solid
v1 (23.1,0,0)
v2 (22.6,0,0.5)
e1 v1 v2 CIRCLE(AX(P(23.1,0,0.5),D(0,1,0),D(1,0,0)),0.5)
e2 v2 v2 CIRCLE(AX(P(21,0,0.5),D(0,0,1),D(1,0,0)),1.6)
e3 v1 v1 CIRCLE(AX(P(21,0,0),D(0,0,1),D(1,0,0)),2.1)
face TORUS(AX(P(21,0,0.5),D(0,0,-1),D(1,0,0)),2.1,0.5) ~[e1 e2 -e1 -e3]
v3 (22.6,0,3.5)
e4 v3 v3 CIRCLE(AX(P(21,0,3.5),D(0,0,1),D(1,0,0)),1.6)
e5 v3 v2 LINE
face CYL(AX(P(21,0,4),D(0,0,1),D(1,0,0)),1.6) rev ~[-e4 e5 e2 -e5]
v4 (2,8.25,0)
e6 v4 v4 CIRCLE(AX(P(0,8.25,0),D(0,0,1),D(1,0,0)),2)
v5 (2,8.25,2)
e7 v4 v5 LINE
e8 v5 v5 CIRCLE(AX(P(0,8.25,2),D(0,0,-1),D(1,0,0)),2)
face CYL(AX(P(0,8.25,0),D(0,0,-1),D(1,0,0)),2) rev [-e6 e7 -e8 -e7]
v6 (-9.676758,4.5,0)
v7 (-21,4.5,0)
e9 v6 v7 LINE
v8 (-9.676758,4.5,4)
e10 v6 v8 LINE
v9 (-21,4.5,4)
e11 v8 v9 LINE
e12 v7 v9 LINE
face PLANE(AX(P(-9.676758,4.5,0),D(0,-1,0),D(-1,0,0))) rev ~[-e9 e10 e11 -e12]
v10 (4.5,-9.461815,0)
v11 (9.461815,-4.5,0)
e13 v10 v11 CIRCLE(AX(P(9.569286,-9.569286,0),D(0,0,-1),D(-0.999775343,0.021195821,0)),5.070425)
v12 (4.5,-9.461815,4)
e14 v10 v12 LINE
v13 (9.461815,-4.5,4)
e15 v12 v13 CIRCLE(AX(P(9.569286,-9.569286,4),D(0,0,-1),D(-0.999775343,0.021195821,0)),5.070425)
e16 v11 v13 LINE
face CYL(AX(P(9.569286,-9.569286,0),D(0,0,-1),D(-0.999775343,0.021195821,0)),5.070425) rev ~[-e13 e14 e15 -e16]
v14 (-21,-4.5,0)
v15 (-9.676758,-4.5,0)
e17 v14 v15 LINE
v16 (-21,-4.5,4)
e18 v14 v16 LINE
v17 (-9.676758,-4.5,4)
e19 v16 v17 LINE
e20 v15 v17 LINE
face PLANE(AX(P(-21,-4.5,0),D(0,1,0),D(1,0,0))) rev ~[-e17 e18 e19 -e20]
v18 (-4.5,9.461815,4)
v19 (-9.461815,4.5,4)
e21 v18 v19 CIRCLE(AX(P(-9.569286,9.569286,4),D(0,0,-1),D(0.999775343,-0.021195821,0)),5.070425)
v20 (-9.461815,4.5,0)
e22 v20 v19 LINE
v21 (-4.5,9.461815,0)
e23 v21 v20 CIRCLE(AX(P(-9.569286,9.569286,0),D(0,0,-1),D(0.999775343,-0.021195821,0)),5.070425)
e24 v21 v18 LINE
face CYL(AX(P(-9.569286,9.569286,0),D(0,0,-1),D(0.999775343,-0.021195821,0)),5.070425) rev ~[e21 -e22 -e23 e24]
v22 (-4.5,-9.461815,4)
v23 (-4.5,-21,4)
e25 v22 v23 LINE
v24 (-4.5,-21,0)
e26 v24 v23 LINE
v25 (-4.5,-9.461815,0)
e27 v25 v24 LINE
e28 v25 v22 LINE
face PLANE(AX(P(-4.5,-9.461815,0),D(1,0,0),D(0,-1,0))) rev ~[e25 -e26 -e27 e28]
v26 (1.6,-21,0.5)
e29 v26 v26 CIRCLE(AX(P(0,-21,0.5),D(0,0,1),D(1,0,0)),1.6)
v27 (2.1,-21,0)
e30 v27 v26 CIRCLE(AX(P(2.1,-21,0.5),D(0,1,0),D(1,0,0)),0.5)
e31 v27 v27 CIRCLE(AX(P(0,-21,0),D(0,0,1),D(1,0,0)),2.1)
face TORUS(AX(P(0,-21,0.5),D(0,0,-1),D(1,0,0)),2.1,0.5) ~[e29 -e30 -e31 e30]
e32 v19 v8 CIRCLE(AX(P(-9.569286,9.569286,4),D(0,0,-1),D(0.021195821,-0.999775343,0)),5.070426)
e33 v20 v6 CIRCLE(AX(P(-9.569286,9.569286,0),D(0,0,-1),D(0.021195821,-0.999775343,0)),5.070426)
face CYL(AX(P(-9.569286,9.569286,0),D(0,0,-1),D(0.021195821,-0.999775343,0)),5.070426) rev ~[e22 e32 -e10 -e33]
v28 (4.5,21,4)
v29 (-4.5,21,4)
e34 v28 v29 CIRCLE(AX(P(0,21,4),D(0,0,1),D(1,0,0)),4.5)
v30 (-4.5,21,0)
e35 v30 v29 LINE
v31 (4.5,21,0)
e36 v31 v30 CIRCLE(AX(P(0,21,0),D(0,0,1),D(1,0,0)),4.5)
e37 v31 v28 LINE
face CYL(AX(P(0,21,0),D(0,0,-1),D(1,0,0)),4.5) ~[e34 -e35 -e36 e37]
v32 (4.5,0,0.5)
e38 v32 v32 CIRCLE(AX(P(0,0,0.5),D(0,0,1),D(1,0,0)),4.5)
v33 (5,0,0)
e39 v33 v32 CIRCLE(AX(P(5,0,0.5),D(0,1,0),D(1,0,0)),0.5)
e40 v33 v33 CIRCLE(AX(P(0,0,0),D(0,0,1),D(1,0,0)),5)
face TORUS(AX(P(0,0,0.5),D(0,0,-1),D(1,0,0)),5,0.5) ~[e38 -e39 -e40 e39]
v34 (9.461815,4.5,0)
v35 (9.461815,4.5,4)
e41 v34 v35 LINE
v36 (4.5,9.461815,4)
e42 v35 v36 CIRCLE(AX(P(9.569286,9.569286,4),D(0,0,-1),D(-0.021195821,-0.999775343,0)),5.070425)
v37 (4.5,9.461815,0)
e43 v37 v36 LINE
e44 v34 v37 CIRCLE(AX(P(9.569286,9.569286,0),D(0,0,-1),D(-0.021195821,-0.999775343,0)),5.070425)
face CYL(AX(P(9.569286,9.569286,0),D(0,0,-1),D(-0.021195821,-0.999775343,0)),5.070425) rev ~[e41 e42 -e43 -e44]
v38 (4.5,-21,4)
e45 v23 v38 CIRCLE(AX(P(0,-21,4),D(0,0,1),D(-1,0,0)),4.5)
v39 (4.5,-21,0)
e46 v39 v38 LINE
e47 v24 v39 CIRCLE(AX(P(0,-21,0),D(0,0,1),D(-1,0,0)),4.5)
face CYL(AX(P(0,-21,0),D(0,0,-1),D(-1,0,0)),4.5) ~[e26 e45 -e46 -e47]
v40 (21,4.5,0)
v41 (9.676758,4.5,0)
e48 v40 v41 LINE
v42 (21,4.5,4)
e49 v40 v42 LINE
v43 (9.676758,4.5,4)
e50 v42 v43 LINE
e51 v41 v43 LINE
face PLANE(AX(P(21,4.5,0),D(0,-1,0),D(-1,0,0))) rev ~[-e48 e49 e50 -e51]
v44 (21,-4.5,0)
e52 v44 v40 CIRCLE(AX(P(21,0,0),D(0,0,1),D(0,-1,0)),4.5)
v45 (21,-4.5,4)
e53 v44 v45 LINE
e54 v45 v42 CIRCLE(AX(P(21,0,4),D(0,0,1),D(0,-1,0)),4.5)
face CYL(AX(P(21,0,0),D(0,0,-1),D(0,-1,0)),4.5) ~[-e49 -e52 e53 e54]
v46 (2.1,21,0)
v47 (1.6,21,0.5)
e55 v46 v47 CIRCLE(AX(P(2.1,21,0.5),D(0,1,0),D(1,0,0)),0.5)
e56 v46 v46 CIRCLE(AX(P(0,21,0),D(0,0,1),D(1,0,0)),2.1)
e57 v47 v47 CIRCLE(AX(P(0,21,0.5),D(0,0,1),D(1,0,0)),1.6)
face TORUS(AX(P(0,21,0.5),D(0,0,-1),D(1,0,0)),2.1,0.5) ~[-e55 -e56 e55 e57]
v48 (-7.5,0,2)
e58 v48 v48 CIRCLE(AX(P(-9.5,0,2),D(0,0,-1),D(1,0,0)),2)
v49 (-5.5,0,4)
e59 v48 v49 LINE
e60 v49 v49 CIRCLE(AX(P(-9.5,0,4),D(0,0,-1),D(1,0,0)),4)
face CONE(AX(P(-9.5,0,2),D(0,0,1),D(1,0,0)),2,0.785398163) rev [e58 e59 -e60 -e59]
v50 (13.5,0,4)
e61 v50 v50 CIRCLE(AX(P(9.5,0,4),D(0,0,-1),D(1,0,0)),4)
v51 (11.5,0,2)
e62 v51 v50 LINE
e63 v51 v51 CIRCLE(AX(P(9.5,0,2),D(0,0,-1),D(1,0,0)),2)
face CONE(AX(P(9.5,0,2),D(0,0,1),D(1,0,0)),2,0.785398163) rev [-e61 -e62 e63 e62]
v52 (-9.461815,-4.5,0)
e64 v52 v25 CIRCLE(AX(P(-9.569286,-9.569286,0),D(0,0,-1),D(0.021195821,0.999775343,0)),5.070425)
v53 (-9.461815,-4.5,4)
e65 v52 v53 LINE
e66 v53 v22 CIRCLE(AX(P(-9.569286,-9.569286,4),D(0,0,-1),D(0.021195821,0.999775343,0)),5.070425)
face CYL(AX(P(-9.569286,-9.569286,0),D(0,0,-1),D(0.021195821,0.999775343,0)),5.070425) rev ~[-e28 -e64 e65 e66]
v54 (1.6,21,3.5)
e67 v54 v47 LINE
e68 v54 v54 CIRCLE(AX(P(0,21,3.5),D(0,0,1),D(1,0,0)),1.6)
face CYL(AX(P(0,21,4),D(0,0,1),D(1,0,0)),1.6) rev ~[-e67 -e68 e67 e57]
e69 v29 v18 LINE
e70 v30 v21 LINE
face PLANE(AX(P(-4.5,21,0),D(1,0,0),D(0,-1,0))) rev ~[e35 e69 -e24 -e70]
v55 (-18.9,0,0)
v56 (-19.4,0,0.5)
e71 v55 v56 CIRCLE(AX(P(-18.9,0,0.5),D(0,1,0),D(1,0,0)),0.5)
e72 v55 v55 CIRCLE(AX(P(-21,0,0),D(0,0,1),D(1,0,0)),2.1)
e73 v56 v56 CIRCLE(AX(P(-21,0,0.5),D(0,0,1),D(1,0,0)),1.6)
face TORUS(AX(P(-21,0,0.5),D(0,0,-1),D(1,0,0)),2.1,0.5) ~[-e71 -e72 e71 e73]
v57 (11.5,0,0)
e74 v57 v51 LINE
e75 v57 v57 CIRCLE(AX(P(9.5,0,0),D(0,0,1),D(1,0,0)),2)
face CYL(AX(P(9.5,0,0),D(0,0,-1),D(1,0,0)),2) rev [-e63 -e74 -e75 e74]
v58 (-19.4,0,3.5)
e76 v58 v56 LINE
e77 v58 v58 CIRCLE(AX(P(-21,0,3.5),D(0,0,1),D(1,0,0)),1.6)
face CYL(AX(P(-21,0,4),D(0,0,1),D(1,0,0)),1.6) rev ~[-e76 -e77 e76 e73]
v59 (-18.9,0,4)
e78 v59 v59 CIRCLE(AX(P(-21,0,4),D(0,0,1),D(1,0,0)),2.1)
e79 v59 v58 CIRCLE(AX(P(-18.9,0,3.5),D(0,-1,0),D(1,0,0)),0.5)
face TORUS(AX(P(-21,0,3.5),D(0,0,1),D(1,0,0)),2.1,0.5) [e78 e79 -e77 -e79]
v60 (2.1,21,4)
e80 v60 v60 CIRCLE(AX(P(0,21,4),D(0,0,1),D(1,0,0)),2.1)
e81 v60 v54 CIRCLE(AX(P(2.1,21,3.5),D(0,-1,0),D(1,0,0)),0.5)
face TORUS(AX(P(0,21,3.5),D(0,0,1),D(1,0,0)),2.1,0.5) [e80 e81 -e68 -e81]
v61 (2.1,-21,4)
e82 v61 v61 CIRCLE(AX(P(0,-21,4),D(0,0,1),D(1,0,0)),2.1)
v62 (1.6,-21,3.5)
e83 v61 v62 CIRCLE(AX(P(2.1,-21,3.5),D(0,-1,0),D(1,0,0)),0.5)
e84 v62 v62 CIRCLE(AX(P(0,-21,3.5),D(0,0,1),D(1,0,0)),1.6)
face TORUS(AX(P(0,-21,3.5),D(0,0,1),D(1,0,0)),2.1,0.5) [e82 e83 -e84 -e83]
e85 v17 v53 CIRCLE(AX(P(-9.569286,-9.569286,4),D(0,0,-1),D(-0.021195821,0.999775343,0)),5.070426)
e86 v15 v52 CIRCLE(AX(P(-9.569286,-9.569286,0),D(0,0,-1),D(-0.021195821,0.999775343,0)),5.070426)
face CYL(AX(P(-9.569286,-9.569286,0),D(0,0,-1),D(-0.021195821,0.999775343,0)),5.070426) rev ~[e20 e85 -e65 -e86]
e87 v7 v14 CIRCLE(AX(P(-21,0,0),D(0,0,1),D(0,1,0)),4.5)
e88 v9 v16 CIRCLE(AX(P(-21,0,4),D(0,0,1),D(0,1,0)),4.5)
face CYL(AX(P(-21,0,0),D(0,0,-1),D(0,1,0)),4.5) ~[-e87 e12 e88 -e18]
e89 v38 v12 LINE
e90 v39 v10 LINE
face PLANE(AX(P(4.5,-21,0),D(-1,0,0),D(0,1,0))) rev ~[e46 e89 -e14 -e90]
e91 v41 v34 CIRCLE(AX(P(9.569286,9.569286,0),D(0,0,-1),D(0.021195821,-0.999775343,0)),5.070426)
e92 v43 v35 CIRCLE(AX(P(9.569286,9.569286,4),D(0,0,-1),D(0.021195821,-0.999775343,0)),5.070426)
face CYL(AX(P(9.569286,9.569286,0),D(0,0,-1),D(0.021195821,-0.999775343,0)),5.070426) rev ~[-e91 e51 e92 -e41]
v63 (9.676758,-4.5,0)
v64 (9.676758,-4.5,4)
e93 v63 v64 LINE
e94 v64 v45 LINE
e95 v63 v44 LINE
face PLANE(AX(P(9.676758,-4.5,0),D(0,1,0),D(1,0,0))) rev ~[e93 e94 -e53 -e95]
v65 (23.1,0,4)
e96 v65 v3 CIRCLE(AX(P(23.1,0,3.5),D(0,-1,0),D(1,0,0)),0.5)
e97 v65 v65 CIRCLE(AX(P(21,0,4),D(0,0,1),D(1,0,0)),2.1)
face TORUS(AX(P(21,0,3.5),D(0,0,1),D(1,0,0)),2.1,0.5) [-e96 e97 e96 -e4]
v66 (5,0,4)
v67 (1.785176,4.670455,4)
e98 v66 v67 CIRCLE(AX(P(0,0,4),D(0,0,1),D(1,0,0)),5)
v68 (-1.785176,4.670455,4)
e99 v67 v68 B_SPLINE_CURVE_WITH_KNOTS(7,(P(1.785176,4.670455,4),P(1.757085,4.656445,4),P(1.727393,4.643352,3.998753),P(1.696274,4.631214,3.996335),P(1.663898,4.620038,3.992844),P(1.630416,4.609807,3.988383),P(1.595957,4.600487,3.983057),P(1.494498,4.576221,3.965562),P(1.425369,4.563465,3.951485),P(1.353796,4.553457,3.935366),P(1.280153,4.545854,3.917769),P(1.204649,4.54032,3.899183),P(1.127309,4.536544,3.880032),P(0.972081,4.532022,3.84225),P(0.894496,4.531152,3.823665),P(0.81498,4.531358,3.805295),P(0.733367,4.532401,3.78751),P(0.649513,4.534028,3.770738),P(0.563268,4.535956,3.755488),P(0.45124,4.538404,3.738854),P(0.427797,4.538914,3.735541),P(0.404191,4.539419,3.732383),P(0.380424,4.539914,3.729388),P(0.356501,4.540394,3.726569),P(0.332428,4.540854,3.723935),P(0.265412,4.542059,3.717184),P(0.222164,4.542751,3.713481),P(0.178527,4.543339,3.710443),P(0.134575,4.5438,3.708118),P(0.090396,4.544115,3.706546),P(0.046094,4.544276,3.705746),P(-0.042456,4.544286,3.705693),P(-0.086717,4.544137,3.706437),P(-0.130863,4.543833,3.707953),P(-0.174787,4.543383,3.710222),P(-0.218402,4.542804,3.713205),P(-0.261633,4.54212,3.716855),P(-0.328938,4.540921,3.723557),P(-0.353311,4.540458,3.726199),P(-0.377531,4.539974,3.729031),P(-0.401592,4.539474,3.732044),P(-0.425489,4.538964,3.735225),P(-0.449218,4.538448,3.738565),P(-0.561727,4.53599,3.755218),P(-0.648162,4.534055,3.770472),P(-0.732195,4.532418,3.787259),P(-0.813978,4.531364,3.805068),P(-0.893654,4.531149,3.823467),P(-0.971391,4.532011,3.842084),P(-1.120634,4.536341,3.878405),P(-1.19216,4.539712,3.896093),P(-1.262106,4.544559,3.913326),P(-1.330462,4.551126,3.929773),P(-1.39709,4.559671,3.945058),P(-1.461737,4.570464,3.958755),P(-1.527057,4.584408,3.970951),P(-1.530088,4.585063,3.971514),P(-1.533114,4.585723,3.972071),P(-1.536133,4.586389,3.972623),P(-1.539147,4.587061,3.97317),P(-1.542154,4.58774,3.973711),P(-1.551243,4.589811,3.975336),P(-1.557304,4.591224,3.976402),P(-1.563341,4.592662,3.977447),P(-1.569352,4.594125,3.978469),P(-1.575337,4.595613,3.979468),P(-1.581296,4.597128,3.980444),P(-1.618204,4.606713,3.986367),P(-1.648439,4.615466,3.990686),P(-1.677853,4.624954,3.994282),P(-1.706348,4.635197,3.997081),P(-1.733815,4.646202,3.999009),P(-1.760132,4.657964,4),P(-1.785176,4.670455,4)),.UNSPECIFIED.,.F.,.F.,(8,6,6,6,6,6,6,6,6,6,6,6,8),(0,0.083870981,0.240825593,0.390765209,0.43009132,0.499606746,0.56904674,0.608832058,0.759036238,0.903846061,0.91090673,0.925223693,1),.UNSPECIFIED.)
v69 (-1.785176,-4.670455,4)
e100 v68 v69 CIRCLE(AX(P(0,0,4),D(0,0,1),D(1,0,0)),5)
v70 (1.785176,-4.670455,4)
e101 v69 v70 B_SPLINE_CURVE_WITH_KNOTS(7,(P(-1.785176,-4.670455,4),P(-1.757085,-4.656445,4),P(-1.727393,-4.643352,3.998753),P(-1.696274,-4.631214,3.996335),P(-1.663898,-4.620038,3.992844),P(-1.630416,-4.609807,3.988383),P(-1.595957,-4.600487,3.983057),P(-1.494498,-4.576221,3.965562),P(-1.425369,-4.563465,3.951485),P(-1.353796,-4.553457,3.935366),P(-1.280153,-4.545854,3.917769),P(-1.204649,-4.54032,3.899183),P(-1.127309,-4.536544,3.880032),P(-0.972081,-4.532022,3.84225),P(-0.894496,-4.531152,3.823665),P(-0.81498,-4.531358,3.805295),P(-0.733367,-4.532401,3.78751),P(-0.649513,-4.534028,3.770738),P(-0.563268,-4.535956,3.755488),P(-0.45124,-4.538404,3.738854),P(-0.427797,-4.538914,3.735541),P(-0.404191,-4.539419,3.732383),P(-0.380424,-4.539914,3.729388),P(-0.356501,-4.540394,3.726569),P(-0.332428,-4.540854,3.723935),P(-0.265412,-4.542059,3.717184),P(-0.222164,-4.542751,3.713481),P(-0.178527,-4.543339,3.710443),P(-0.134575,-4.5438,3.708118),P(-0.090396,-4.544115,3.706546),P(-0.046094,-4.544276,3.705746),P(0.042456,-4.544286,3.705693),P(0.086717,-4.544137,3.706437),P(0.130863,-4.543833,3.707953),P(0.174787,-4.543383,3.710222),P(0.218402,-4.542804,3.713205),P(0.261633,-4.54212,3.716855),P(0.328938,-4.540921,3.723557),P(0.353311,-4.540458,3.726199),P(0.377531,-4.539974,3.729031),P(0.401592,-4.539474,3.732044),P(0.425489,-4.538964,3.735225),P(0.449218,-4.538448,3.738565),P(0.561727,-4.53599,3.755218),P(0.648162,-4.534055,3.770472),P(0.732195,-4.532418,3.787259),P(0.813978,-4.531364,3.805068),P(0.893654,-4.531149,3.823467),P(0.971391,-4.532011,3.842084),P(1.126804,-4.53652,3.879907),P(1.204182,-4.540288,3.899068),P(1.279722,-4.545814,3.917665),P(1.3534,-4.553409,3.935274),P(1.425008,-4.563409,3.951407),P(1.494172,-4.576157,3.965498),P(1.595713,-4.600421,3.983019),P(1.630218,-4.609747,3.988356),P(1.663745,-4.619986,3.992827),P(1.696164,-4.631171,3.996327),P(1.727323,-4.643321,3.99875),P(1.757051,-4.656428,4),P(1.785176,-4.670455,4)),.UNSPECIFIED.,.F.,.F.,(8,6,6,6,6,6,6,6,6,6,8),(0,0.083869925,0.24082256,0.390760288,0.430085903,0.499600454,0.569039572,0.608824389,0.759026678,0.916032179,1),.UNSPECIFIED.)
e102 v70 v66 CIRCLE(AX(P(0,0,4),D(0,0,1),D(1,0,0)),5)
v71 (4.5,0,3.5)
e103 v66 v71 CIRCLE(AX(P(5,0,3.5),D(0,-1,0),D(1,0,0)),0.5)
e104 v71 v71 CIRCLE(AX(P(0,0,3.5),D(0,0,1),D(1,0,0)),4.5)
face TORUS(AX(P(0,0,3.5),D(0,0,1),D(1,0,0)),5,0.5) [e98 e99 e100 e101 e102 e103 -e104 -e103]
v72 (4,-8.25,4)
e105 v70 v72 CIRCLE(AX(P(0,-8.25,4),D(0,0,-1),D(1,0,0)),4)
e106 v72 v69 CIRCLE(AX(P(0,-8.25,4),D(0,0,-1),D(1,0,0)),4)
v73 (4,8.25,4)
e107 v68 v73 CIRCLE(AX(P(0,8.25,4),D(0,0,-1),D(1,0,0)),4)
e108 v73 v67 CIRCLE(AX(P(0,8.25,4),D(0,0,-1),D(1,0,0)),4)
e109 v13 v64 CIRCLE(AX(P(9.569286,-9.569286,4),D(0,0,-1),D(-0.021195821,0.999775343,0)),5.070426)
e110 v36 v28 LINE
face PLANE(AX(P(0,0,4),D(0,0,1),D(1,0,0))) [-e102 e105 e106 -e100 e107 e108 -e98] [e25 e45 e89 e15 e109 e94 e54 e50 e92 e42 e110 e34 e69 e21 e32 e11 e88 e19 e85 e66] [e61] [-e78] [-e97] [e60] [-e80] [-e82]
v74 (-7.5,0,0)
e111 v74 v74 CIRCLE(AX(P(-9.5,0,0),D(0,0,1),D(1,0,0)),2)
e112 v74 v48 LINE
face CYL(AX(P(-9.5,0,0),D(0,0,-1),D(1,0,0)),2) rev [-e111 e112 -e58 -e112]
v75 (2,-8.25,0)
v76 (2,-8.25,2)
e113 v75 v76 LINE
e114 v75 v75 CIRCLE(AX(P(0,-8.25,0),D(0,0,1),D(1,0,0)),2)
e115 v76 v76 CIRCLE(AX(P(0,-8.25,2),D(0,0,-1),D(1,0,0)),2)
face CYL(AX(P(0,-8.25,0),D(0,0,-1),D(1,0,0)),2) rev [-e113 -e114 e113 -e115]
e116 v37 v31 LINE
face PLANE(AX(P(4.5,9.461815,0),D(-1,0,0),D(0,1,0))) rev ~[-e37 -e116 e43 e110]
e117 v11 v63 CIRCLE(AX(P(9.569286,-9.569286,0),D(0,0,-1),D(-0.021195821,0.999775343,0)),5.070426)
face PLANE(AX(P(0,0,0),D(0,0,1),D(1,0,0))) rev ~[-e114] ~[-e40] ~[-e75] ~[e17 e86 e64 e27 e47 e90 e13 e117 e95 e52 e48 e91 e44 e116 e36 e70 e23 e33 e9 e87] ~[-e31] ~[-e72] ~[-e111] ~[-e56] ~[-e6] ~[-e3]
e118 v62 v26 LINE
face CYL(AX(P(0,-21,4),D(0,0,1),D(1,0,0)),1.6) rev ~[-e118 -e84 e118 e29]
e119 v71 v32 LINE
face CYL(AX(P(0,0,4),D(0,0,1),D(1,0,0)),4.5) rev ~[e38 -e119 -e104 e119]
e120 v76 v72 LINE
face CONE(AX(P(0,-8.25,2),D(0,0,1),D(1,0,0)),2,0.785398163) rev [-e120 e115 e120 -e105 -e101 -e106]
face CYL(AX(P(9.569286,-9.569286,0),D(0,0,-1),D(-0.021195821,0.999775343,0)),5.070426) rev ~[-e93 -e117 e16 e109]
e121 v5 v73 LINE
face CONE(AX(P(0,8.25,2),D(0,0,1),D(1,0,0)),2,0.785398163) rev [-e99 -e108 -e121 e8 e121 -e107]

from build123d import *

# Parameters (mm, degrees)
F1_DEPTH = 4
F2_R     = 4.5
F3_DEPTH = 4.001
F4_R     = 1.6
F5_DEPTH = 4.001
F6_R     = 2
F7_DEPTH = 4.001
F8_R     = 0.5


# Not quite as in the source:
# - a fillet or chamfer that OpenCascade refuses, or shapes differently, is made with other operations: its cross-section is extruded or revolved along the edge and cut away or added


with BuildPart() as f1:
    # F0 (on Top) → F1 (new body)
    with BuildSketch(Plane.XY):
        with BuildLine():
            Line((4.5, -21), (4.5, -9.4618145376))
            ThreePointArc((4.5, -9.4618145376), (5.9839541329, -5.9839541329), (9.4618145376, -4.5))
            ThreePointArc((9.4618145376, -4.5), (9.5692863688, -4.4988608952), (9.6767581999, -4.5))
            Line((9.6767581999, -4.5), (21, -4.5))
            ThreePointArc((21, -4.5), (25.5, 0), (21, 4.5))
            Line((21, 4.5), (9.6767581999, 4.5))
            ThreePointArc((9.6767581999, 4.5), (9.5692863688, 4.4988608952), (9.4618145376, 4.5))
            ThreePointArc((9.4618145376, 4.5), (5.9839541329, 5.9839541329), (4.5, 9.4618145376))
            Line((4.5, 9.4618145376), (4.5, 21))
            ThreePointArc((4.5, 21), (0, 25.5), (-4.5, 21))
            Line((-4.5, 21), (-4.5, 9.4618145376))
            ThreePointArc((-4.5, 9.4618145376), (-5.9839541329, 5.9839541329), (-9.4618145376, 4.5))
            ThreePointArc((-9.4618145376, 4.5), (-9.5692863688, 4.4988608952), (-9.6767581999, 4.5))
            Line((-9.6767581999, 4.5), (-21, 4.5))
            ThreePointArc((-21, 4.5), (-25.5, 0), (-21, -4.5))
            Line((-21, -4.5), (-9.6767581999, -4.5))
            ThreePointArc((-9.6767581999, -4.5), (-9.5692863688, -4.4988608952), (-9.4618145376, -4.5))
            ThreePointArc((-9.4618145376, -4.5), (-5.9839541329, -5.9839541329), (-4.5, -9.4618145376))
            Line((-4.5, -9.4618145376), (-4.5, -21))
            ThreePointArc((-4.5, -21), (0, -25.5), (4.5, -21))
        make_face()
    extrude(amount=F1_DEPTH)

    # F2 (on face) → F3 (cut, through all)
    with BuildSketch(Plane.XY.offset(4)):
        Circle(F2_R)
    extrude(amount=-F3_DEPTH, mode=Mode.SUBTRACT)

    # F4 (on face) → F5 (cut, through all)
    with BuildSketch(Plane.XY.offset(4)):
        with Locations((21, 0)):
            Circle(F4_R)
        with Locations((0, -21)):
            Circle(F4_R)
        with Locations((-21, 0)):
            Circle(F4_R)
        with Locations((0, 21)):
            Circle(F4_R)
    extrude(amount=-F5_DEPTH, mode=Mode.SUBTRACT)

    # F6 (on Top) → F7 (cut, through all)
    with BuildSketch(Plane.XY):
        with Locations((9.5, 0)):
            Circle(F6_R)
        with Locations((-9.5, 0)):
            Circle(F6_R)
        with Locations((0, -8.25)):
            Circle(F6_R)
        with Locations((0, 8.25)):
            Circle(F6_R)
    extrude(amount=F7_DEPTH, mode=Mode.SUBTRACT)

    # F8
    f8_edges = [f1.edges().sort_by_distance(p)[0] for p in [
        (-4.5, 0, 4),
        (-4.5, 0, 0),
        (19.4, 0, 4),
        (-22.6, 0, 4),
        (-1.6, -21, 4),
        (-1.6, 21, 4),
        (-22.6, 0, 0),
        (19.4, 0, 0),
        (-1.6, 21, 0),
        (-1.6, -21, 0),
    ]]
    fillet(f8_edges, radius=F8_R)

    # F9: chamfer of 2 on 4 edges, made by hand

    # F9_s1 → F9_t2 (revolve, cut)
    with BuildSketch(Plane.XZ.offset(-8.25)):
        Polygon((2, 2), (4, 4), (2, 4), align=None)
    revolve(axis=Axis((0, 8.25, 4), (0, 0, -1)), mode=Mode.SUBTRACT)

    # F9_s3 → F9_t4 (revolve, cut)
    with BuildSketch(Plane.XZ):
        Polygon((11.5, 2), (13.5, 4), (11.5, 4), align=None)
    revolve(axis=Axis((9.5, 0, 4), (0, 0, -1)), mode=Mode.SUBTRACT)

    # F9_s5 → F9_t6 (revolve, cut)
    with BuildSketch(Plane.XZ.offset(8.25)):
        Polygon((2, 2), (4, 4), (2, 4), align=None)
    revolve(axis=Axis((0, -8.25, 4), (0, 0, -1)), mode=Mode.SUBTRACT)

    # F9_s7 → F9_t8 (revolve, cut)
    with BuildSketch(Plane.XZ):
        Polygon((-7.5, 2), (-5.5, 4), (-7.5, 4), align=None)
    revolve(axis=Axis((-9.5, 0, 4), (0, 0, -1)), mode=Mode.SUBTRACT)


solid = f1.part
